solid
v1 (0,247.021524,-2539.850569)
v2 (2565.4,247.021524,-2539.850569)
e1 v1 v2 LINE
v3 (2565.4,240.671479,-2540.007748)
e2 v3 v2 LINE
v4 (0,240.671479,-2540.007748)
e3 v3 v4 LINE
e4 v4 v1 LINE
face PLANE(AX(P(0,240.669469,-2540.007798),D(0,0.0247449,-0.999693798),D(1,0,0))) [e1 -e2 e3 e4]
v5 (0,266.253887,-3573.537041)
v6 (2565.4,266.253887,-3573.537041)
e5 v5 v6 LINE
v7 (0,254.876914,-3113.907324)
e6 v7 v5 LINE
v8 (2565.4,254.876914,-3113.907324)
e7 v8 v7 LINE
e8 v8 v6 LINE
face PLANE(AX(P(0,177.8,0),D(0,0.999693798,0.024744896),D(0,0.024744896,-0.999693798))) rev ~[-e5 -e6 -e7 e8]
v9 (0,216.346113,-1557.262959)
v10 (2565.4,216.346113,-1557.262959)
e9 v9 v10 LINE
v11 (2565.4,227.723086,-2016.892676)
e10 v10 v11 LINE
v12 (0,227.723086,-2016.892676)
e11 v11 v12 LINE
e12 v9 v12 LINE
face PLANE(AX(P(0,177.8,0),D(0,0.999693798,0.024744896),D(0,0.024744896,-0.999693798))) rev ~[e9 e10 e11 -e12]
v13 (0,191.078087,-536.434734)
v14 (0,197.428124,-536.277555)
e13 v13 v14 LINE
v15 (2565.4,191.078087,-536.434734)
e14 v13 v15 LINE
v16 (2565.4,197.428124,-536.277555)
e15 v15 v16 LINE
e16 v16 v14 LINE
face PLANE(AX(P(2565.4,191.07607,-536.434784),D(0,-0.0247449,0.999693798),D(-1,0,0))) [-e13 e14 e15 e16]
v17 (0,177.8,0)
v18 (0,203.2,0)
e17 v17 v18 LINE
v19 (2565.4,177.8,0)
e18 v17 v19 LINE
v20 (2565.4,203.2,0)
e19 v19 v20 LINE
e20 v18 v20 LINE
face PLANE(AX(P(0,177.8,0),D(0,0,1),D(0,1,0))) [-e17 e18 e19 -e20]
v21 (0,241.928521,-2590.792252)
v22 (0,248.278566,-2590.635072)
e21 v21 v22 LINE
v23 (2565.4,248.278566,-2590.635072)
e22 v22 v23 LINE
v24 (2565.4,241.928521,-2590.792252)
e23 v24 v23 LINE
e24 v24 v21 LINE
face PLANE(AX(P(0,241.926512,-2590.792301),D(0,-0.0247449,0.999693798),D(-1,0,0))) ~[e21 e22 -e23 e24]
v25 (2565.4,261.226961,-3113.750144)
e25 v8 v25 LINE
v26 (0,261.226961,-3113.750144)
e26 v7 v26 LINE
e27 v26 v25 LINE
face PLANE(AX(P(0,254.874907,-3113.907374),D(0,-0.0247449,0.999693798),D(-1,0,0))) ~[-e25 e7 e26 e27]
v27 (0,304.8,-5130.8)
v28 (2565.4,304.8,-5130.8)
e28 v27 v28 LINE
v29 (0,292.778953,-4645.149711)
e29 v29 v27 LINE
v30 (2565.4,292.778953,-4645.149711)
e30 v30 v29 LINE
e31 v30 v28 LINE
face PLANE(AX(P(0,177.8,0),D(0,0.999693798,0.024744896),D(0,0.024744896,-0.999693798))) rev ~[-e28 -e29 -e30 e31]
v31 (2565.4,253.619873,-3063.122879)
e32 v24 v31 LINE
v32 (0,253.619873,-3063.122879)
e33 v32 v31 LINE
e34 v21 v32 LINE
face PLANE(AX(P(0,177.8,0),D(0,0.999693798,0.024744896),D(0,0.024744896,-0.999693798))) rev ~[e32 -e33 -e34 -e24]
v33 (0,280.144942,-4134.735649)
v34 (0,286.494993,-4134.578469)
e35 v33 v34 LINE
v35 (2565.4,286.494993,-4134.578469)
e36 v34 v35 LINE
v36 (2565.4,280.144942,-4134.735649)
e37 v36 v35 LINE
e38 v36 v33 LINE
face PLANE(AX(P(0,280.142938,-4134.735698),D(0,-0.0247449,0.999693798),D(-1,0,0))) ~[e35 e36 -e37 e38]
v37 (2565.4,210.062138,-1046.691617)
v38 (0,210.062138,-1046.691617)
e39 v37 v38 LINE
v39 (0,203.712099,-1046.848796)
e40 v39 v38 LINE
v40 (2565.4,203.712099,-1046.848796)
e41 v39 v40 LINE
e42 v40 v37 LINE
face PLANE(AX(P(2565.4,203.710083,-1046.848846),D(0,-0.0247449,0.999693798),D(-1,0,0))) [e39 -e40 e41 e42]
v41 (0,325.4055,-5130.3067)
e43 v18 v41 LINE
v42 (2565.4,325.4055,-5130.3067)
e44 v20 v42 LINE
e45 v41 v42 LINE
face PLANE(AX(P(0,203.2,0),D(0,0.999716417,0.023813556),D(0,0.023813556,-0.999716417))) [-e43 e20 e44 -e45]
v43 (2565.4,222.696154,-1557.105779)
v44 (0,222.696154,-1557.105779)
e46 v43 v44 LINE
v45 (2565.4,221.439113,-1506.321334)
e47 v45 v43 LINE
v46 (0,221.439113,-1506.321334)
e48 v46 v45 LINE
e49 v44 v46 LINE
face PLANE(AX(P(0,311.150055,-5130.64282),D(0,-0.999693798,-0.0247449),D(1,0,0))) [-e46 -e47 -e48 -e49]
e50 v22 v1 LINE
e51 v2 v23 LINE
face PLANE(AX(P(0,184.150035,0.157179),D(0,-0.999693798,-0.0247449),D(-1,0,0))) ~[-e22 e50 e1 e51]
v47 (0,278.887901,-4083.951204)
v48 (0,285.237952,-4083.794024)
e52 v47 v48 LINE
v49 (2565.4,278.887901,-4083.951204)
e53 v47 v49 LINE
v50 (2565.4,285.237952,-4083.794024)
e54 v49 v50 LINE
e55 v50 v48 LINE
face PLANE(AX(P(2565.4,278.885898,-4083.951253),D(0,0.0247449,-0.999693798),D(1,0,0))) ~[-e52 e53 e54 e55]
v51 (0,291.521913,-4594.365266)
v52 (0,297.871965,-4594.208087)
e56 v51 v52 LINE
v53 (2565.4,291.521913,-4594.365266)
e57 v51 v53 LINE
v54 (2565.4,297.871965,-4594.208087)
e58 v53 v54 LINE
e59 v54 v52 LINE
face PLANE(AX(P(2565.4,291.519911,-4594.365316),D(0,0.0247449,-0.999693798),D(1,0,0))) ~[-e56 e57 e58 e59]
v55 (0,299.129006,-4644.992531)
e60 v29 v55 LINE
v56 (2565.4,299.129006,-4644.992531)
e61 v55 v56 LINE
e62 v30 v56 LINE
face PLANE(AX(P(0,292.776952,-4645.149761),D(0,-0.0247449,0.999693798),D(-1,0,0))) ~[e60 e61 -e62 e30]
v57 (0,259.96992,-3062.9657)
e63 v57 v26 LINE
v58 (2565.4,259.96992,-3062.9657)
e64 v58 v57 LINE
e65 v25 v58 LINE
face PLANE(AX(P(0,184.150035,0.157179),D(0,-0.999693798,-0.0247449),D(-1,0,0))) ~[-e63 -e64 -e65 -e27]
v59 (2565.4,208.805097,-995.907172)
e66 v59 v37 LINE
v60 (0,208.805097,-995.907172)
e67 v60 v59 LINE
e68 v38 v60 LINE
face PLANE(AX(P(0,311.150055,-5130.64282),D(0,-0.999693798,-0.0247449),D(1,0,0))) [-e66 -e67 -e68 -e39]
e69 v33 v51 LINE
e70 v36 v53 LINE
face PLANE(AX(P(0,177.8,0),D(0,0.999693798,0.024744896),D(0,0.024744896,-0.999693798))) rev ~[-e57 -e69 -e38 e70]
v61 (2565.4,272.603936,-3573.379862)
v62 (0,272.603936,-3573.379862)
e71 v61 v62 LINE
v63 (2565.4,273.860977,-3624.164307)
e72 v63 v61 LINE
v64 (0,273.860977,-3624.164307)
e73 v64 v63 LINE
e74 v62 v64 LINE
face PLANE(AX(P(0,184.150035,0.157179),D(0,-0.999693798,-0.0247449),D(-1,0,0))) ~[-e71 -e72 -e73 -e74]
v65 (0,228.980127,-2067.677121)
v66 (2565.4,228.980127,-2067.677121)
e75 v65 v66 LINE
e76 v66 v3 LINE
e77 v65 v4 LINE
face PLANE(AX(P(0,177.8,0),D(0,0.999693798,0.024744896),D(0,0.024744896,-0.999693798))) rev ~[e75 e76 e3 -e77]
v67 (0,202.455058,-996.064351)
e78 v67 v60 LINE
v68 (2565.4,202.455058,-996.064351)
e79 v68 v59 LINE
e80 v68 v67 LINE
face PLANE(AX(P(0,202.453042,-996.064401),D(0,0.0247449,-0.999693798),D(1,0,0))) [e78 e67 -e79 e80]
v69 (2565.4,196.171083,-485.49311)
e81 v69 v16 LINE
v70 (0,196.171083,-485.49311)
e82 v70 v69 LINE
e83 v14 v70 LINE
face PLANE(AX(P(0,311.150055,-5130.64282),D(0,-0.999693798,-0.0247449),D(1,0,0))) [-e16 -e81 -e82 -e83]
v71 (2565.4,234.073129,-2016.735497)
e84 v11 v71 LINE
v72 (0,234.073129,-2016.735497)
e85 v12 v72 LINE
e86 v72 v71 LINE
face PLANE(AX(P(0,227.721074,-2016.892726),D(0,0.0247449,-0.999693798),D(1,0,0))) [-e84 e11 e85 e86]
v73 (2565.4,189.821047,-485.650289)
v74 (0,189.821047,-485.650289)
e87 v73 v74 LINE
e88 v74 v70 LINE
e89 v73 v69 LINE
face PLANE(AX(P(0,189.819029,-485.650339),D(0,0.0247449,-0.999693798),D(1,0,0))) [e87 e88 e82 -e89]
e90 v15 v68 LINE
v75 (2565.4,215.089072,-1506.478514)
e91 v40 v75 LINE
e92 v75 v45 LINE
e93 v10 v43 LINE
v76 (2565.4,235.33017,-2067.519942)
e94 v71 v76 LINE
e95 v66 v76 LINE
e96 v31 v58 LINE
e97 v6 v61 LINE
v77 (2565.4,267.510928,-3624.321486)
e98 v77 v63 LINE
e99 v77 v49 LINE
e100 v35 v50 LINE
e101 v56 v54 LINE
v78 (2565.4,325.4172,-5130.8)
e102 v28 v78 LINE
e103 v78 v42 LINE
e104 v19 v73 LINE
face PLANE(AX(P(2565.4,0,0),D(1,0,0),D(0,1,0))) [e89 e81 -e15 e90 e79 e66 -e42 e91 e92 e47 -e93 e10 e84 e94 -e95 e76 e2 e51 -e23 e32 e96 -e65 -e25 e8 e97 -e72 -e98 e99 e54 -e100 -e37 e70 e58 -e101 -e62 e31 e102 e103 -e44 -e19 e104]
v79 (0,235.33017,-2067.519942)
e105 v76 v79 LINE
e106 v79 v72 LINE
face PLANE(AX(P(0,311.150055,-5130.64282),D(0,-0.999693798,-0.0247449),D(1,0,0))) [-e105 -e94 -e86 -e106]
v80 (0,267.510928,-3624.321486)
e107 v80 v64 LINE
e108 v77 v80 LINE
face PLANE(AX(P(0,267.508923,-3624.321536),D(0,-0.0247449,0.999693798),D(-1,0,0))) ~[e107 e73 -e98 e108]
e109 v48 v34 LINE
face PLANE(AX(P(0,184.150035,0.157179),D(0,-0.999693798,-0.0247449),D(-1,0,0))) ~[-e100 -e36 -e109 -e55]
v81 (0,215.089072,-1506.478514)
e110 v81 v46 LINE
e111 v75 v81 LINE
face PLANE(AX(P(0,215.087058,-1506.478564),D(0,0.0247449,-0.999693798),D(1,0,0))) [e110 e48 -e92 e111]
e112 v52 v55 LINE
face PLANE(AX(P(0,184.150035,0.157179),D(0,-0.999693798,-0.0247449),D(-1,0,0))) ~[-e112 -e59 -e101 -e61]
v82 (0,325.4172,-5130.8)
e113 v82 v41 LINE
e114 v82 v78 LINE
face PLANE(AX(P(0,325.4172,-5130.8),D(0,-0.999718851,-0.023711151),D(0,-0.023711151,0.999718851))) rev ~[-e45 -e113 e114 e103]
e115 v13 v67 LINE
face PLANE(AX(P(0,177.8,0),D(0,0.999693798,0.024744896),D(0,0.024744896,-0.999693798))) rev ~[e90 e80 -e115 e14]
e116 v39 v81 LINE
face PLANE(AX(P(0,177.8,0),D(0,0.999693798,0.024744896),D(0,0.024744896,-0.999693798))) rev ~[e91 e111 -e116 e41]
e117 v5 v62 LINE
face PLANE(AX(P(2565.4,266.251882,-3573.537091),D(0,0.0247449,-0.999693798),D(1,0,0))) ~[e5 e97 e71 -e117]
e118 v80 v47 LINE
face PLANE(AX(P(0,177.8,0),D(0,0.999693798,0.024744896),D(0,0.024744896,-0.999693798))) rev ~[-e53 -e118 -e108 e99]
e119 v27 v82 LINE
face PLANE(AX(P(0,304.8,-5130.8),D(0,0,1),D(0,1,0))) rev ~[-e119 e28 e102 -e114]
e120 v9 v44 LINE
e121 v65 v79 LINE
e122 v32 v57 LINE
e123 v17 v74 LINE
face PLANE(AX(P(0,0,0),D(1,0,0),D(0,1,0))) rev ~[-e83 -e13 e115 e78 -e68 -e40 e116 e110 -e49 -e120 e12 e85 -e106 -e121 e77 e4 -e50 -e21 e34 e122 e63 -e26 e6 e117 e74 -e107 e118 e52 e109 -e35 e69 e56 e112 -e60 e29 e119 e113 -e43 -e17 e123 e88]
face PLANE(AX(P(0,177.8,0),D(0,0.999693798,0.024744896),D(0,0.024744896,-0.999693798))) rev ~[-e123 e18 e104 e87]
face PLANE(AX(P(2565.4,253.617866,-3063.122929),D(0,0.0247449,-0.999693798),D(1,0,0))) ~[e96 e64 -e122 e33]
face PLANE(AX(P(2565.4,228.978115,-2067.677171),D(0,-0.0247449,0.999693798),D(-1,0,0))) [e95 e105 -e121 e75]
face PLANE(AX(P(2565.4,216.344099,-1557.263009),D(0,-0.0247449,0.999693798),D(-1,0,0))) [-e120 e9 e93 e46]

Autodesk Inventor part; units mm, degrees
ref_plane "YZ Plane" through (0, 0, 0) normal (1, 0, 0) x (0, 1, 0)
ref_plane "XZ Plane" through (0, 0, 0) normal (0, 1, 0) x (-1, 0, 0)
ref_plane "XY Plane" through (0, 0, 0) normal (0, 0, 1) x (1, 0, 0)
sketch "Sketch1" plane through (0, 0, 0) normal (1, 0, 0) x (0, 1, 0)
  line L0 (0, 0) -> (177.8, 0) construction
  line L1 (177.8, 0) -> (177.8, -5130.8) construction
  line L2 (177.8, -5130.8) -> (304.8, -5130.8) construction
  line L3 (177.8, 0) -> (304.8, -5130.8)
  line L4 (177.8, 0) -> (203.2, 0)
  line L5 (203.2, 0) -> (325.4055, -5130.3067)
  line L6 (304.8, -5130.8) -> (325.4172, -5130.8)
  line L7 (304.8, -5130.8) -> (325.4172, -5130.8) construction
  line L8 (325.4172, -5130.8) -> (325.4055, -5130.3067)
  dimension "d0" = 177.8
  dimension "d1" = 5130.8
  dimension "d2" = 127
  dimension "d3" = 25.4
  dimension "d4" = 0
extrude "Extrusion1" add sketch "Sketch1" along normal blind 2565.4
sketch "Sketch2" plane through (0, 304.8, -5130.8) normal (0, -0.9996938, -0.0247449) x (1, 0, 0)
  line L0 (0, 5131.743) -> (2565.4, 5131.743) construction
  line L1 (1282.7, 5131.743) -> (1282.7, 0) construction
  line L2 (0, 0) -> (2565.4, 0) construction
  line L3 (2565.4, 5132.3715) -> (2565.4, 0) construction
  line L4 (2565.4, 2566.1858) -> (0, 2566.1858) construction
  line L5 (1282.7, 5131.743) -> (1282.7, 4621.1725) construction
  line L6 (1282.7, 4621.1725) -> (1282.7, 4110.6021) construction
  line L7 (1282.7, 4110.6021) -> (1282.7, 3600.0316) construction
  line L8 (1282.7, 3600.0316) -> (1282.7, 3089.4611) construction
  line L9 (1282.7, 3089.4611) -> (1282.7, 2566.1858) construction
  line L10 (0, 4646.5725) -> (2565.4, 4646.5725)
  line L11 (2565.4, 4646.5725) -> (2565.4, 4595.7725)
  line L12 (2565.4, 4595.7725) -> (0, 4595.7725)
  line L13 (0, 4595.7725) -> (0, 4646.5725)
  line L14 (0, 4646.5725) -> (2565.4, 4595.7725) construction
  line L15 (2565.4, 4646.5725) -> (0, 4595.7725) construction
  line L16 (0, 4136.0021) -> (2565.4, 4136.0021)
  line L17 (2565.4, 4136.0021) -> (2565.4, 4085.2021)
  line L18 (2565.4, 4085.2021) -> (0, 4085.2021)
  line L19 (0, 4085.2021) -> (0, 4136.0021)
  line L20 (0, 4136.0021) -> (2565.4, 4085.2021) construction
  line L21 (2565.4, 4136.0021) -> (0, 4085.2021) construction
  line L22 (0, 3625.4316) -> (2565.4, 3625.4316)
  line L23 (2565.4, 3625.4316) -> (2565.4, 3574.6316)
  line L24 (2565.4, 3574.6316) -> (0, 3574.6316)
  line L25 (0, 3574.6316) -> (0, 3625.4316)
  line L26 (0, 3625.4316) -> (2565.4, 3574.6316) construction
  line L27 (2565.4, 3625.4316) -> (0, 3574.6316) construction
  line L28 (0, 3114.8611) -> (2565.4, 3114.8611)
  line L29 (2565.4, 3114.8611) -> (2565.4, 3064.0611)
  line L30 (2565.4, 3064.0611) -> (0, 3064.0611)
  line L31 (0, 3064.0611) -> (0, 3114.8611)
  line L32 (0, 3114.8611) -> (2565.4, 3064.0611) construction
  line L33 (2565.4, 3114.8611) -> (0, 3064.0611) construction
  line L34 (0, 5132.3715) -> (0, 0) projected
  line L35 (2565.4, 2566.1858) -> (0, 2566.1858)
  line L36 (0, 2566.1858) -> (0, 2591.5858)
  line L37 (0, 2591.5858) -> (2565.4, 2591.5858)
  line L38 (2565.4, 2591.5858) -> (2565.4, 2566.1858)
  point P0 (0, 5136.7712)
  dimension "d7" = 510.5705
  dimension "d8" = 510.5705
  dimension "d9" = 510.5705
  dimension "d10" = 510.5705
  dimension "d11" = 50.8
  dimension "d12" = 50.8
  dimension "d13" = 50.8
  dimension "d14" = 2565.4
  dimension "d15" = 50.8
  dimension "d16" = 25.4
extrude "Extrusion2" cut sketch "Sketch2" against normal blind 6.35
sketch "Sketch3" plane through (0, 304.8, -5130.8) normal (0, -0.9996938, -0.0247449) x (1, 0, 0)
  line L0 (2565.4, 2566.1858) -> (0, 2566.1858) construction
  line L1 (2565.4, 2566.1858) -> (0, 2565.6164) construction
  line L2 (0, -0.5102) -> (0, 5131.743) construction
  point P0 (0, 5136.7712)
mirror "Mirror1" about plane through (2565.4, 241.3, -2565.4) normal (0, -0.0247449, 0.9996938) of "Extrusion2"
properties part number "Roof" material "Aluminum 6061-AHC"
